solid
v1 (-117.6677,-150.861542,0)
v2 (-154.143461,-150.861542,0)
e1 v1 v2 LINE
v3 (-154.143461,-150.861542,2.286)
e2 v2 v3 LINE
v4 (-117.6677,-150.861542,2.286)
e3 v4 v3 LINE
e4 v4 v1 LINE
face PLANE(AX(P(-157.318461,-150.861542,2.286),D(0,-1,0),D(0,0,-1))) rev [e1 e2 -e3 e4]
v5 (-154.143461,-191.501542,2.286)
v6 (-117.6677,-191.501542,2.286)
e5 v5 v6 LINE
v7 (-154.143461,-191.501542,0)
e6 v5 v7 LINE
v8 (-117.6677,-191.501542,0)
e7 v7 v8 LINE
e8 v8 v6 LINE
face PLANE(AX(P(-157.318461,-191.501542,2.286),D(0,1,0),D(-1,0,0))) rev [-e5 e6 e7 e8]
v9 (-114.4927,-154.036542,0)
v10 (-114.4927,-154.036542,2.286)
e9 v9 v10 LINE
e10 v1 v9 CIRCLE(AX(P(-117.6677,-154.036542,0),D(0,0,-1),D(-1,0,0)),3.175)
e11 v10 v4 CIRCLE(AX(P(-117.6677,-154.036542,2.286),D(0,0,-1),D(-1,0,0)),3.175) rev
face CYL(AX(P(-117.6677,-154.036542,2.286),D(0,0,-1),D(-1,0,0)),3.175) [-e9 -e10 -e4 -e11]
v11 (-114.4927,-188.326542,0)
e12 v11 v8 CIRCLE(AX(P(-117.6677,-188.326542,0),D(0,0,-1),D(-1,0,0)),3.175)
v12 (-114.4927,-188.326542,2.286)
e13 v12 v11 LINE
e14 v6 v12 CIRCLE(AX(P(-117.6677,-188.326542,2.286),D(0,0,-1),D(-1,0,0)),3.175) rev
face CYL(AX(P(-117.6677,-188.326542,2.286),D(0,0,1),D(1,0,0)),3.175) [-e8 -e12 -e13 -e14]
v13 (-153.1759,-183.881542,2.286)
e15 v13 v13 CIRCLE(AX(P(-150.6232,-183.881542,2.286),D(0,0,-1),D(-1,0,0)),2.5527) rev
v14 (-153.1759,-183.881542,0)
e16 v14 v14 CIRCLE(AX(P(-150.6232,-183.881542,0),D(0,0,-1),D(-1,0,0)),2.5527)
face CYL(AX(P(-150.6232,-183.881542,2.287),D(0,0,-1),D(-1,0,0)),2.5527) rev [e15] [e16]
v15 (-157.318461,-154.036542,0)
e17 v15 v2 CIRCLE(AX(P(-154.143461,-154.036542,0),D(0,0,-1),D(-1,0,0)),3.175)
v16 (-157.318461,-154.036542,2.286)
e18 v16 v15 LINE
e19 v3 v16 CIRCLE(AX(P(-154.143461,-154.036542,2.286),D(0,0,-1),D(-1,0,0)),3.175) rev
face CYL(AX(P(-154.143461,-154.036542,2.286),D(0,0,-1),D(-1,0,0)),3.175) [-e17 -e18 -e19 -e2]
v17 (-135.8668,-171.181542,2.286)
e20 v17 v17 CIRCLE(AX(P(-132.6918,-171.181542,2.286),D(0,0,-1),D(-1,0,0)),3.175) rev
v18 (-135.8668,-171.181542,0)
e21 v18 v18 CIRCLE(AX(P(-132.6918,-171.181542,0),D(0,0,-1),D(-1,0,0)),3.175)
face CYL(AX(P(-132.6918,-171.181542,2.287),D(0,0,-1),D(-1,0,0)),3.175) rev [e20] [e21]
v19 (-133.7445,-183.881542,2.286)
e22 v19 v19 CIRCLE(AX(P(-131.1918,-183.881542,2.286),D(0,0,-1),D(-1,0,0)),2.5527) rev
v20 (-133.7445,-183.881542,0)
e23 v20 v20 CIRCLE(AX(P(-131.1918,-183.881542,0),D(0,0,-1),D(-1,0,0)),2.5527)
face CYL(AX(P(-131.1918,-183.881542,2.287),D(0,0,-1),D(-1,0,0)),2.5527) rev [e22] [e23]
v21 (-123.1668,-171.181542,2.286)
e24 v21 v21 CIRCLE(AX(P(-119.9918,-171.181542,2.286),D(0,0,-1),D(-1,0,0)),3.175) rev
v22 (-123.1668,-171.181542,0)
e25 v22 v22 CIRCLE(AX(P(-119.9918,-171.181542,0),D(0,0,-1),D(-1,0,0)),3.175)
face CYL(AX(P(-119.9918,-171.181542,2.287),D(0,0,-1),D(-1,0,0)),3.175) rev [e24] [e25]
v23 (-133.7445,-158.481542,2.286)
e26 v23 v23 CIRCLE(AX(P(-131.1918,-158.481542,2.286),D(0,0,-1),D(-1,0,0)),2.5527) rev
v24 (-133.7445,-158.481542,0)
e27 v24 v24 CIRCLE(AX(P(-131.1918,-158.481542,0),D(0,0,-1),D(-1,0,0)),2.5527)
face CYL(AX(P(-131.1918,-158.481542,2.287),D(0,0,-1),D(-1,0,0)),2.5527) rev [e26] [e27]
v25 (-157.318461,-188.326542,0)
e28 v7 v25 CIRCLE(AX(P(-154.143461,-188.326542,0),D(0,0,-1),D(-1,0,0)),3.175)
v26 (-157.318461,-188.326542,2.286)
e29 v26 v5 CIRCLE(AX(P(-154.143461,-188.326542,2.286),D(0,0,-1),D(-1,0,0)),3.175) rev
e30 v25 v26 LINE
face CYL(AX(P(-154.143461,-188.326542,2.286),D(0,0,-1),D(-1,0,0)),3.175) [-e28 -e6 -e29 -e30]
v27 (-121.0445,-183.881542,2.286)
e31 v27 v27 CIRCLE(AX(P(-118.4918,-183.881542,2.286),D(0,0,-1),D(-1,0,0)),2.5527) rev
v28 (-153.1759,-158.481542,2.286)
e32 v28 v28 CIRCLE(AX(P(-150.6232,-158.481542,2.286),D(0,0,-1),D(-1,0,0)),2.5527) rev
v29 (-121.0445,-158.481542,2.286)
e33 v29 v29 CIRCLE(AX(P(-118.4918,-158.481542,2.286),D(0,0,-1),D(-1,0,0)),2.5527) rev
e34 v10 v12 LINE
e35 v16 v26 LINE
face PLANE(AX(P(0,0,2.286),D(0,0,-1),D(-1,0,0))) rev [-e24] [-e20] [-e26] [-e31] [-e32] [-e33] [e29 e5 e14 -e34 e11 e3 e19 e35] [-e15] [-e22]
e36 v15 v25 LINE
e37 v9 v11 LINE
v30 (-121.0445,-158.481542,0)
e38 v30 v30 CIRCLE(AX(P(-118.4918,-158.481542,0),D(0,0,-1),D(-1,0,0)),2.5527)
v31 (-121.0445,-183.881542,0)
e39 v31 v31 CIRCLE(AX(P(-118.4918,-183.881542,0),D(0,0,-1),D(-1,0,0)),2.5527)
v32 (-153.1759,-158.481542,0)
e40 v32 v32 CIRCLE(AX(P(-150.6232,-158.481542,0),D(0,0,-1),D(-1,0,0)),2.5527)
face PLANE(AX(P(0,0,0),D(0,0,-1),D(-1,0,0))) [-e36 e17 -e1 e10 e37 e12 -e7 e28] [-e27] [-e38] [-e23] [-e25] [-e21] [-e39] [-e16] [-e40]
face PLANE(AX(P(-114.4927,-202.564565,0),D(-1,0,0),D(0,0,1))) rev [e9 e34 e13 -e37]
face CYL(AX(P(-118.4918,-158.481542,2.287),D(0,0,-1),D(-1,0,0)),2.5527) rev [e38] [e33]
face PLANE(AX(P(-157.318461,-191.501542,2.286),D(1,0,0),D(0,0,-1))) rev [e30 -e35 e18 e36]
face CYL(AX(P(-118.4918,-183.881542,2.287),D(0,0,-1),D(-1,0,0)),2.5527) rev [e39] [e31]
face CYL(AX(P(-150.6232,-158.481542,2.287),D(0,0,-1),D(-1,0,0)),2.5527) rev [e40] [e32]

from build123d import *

# Parameters (mm, degrees)
SKETCH1_W              = 76.2
SKETCH1_H              = 40.64
BASE_FLANGE1_DEPTH     = 2.286
CUT_EXTRUDE1_REACH     = 249.845
SKETCH6_R              = 2.5527
SKETCH6_R_2            = 3.175
FILLET1_R              = 3.175
SKETCH7_W              = 53.484881044
SKETCH7_H              = 41.537228889
REMOVE_3RD_STAGE_DEPTH = 2.54
FILLET2_R              = 3.175
SKETCH8_W              = 26.577580406
SKETCH8_H              = 64.780145769
REMOVE_2ND_STAGE_DEPTH = 248.845041068
FILLET3_R              = 3.175


# Sheet-metal steps are written as plain solids
with BuildPart() as part:
    # Sketch1 → Base-Flange1 (new body)
    with BuildSketch(Plane.XY):
        with Locations((-119.218460544, -171.181541922)):
            Rectangle(SKETCH1_W, SKETCH1_H)
    extrude(amount=BASE_FLANGE1_DEPTH)

    # Sketch6 → Cut-Extrude1 (cut, up to next)
    with BuildSketch(Plane(origin=(0, 0, 0), x_dir=(-1, 0, 0), z_dir=(0, 0, -1)), mode=Mode.PRIVATE) as cut_extrude1_sk1:
        with Locations((150.6232, -158.481541922)):
            Circle(SKETCH6_R)
    cut_extrude1_tool1 = extrude(cut_extrude1_sk1.sketch, amount=-CUT_EXTRUDE1_REACH, mode=Mode.PRIVATE) & part.part
    # Sketch6 → Cut-Extrude1 (cut, up to next)
    with BuildSketch(Plane(origin=(0, 0, 0), x_dir=(-1, 0, 0), z_dir=(0, 0, -1)), mode=Mode.PRIVATE) as cut_extrude1_sk2:
        with Locations((150.6232, -183.881541922)):
            Circle(SKETCH6_R)
    cut_extrude1_tool2 = extrude(cut_extrude1_sk2.sketch, amount=-CUT_EXTRUDE1_REACH, mode=Mode.PRIVATE) & part.part
    # Sketch6 → Cut-Extrude1 (cut, up to next)
    with BuildSketch(Plane(origin=(0, 0, 0), x_dir=(-1, 0, 0), z_dir=(0, 0, -1)), mode=Mode.PRIVATE) as cut_extrude1_sk3:
        with Locations((118.4918, -158.481541922)):
            Circle(SKETCH6_R)
    cut_extrude1_tool3 = extrude(cut_extrude1_sk3.sketch, amount=-CUT_EXTRUDE1_REACH, mode=Mode.PRIVATE) & part.part
    # Sketch6 → Cut-Extrude1 (cut, up to next)
    with BuildSketch(Plane(origin=(0, 0, 0), x_dir=(-1, 0, 0), z_dir=(0, 0, -1)), mode=Mode.PRIVATE) as cut_extrude1_sk4:
        with Locations((119.9918, -171.181541922)):
            Circle(SKETCH6_R_2)
    cut_extrude1_tool4 = extrude(cut_extrude1_sk4.sketch, amount=-CUT_EXTRUDE1_REACH, mode=Mode.PRIVATE) & part.part
    # Sketch6 → Cut-Extrude1 (cut, up to next)
    with BuildSketch(Plane(origin=(0, 0, 0), x_dir=(-1, 0, 0), z_dir=(0, 0, -1)), mode=Mode.PRIVATE) as cut_extrude1_sk5:
        with Locations((118.4918, -183.881541922)):
            Circle(SKETCH6_R)
    cut_extrude1_tool5 = extrude(cut_extrude1_sk5.sketch, amount=-CUT_EXTRUDE1_REACH, mode=Mode.PRIVATE) & part.part
    # Sketch6 → Cut-Extrude1 (cut, up to next)
    with BuildSketch(Plane(origin=(0, 0, 0), x_dir=(-1, 0, 0), z_dir=(0, 0, -1)), mode=Mode.PRIVATE) as cut_extrude1_sk6:
        with Locations((131.1918, -158.481541922)):
            Circle(SKETCH6_R)
    cut_extrude1_tool6 = extrude(cut_extrude1_sk6.sketch, amount=-CUT_EXTRUDE1_REACH, mode=Mode.PRIVATE) & part.part
    # Sketch6 → Cut-Extrude1 (cut, up to next)
    with BuildSketch(Plane(origin=(0, 0, 0), x_dir=(-1, 0, 0), z_dir=(0, 0, -1)), mode=Mode.PRIVATE) as cut_extrude1_sk7:
        with Locations((132.6918, -171.181541922)):
            Circle(SKETCH6_R_2)
    cut_extrude1_tool7 = extrude(cut_extrude1_sk7.sketch, amount=-CUT_EXTRUDE1_REACH, mode=Mode.PRIVATE) & part.part
    # Sketch6 → Cut-Extrude1 (cut, up to next)
    with BuildSketch(Plane(origin=(0, 0, 0), x_dir=(-1, 0, 0), z_dir=(0, 0, -1)), mode=Mode.PRIVATE) as cut_extrude1_sk8:
        with Locations((131.1918, -183.881541922)):
            Circle(SKETCH6_R)
    cut_extrude1_tool8 = extrude(cut_extrude1_sk8.sketch, amount=-CUT_EXTRUDE1_REACH, mode=Mode.PRIVATE) & part.part
    # Sketch6 → Cut-Extrude1 (cut, up to next)
    with BuildSketch(Plane(origin=(0, 0, 0), x_dir=(-1, 0, 0), z_dir=(0, 0, -1)), mode=Mode.PRIVATE) as cut_extrude1_sk9:
        with Locations((105.7918, -158.481541922)):
            Circle(SKETCH6_R)
    cut_extrude1_tool9 = extrude(cut_extrude1_sk9.sketch, amount=-CUT_EXTRUDE1_REACH, mode=Mode.PRIVATE) & part.part
    # Sketch6 → Cut-Extrude1 (cut, up to next)
    with BuildSketch(Plane(origin=(0, 0, 0), x_dir=(-1, 0, 0), z_dir=(0, 0, -1)), mode=Mode.PRIVATE) as cut_extrude1_sk10:
        with Locations((107.2918, -171.181541922)):
            Circle(SKETCH6_R_2)
    cut_extrude1_tool10 = extrude(cut_extrude1_sk10.sketch, amount=-CUT_EXTRUDE1_REACH, mode=Mode.PRIVATE) & part.part
    # Sketch6 → Cut-Extrude1 (cut, up to next)
    with BuildSketch(Plane(origin=(0, 0, 0), x_dir=(-1, 0, 0), z_dir=(0, 0, -1)), mode=Mode.PRIVATE) as cut_extrude1_sk11:
        with Locations((105.7918, -183.881541922)):
            Circle(SKETCH6_R)
    cut_extrude1_tool11 = extrude(cut_extrude1_sk11.sketch, amount=-CUT_EXTRUDE1_REACH, mode=Mode.PRIVATE) & part.part
    # Sketch6 → Cut-Extrude1 (cut, up to next)
    with BuildSketch(Plane(origin=(0, 0, 0), x_dir=(-1, 0, 0), z_dir=(0, 0, -1)), mode=Mode.PRIVATE) as cut_extrude1_sk12:
        with Locations((93.0918, -158.481541922)):
            Circle(SKETCH6_R)
    cut_extrude1_tool12 = extrude(cut_extrude1_sk12.sketch, amount=-CUT_EXTRUDE1_REACH, mode=Mode.PRIVATE) & part.part
    # Sketch6 → Cut-Extrude1 (cut, up to next)
    with BuildSketch(Plane(origin=(0, 0, 0), x_dir=(-1, 0, 0), z_dir=(0, 0, -1)), mode=Mode.PRIVATE) as cut_extrude1_sk13:
        with Locations((94.5918, -171.181541922)):
            Circle(SKETCH6_R_2)
    cut_extrude1_tool13 = extrude(cut_extrude1_sk13.sketch, amount=-CUT_EXTRUDE1_REACH, mode=Mode.PRIVATE) & part.part
    # Sketch6 → Cut-Extrude1 (cut, up to next)
    with BuildSketch(Plane(origin=(0, 0, 0), x_dir=(-1, 0, 0), z_dir=(0, 0, -1)), mode=Mode.PRIVATE) as cut_extrude1_sk14:
        with Locations((93.0918, -183.881541922)):
            Circle(SKETCH6_R)
    cut_extrude1_tool14 = extrude(cut_extrude1_sk14.sketch, amount=-CUT_EXTRUDE1_REACH, mode=Mode.PRIVATE) & part.part
    add(cut_extrude1_tool1.solids().sort_by_distance((-150.6232, -158.481542, 0))[0], mode=Mode.SUBTRACT)
    add(cut_extrude1_tool2.solids().sort_by_distance((-150.6232, -183.881542, 0))[0], mode=Mode.SUBTRACT)
    add(cut_extrude1_tool3.solids().sort_by_distance((-118.4918, -158.481542, 0))[0], mode=Mode.SUBTRACT)
    add(cut_extrude1_tool4.solids().sort_by_distance((-119.9918, -171.181542, 0))[0], mode=Mode.SUBTRACT)
    add(cut_extrude1_tool5.solids().sort_by_distance((-118.4918, -183.881542, 0))[0], mode=Mode.SUBTRACT)
    add(cut_extrude1_tool6.solids().sort_by_distance((-131.1918, -158.481542, 0))[0], mode=Mode.SUBTRACT)
    add(cut_extrude1_tool7.solids().sort_by_distance((-132.6918, -171.181542, 0))[0], mode=Mode.SUBTRACT)
    add(cut_extrude1_tool8.solids().sort_by_distance((-131.1918, -183.881542, 0))[0], mode=Mode.SUBTRACT)
    add(cut_extrude1_tool9.solids().sort_by_distance((-105.7918, -158.481542, 0))[0], mode=Mode.SUBTRACT)
    add(cut_extrude1_tool10.solids().sort_by_distance((-107.2918, -171.181542, 0))[0], mode=Mode.SUBTRACT)
    add(cut_extrude1_tool11.solids().sort_by_distance((-105.7918, -183.881542, 0))[0], mode=Mode.SUBTRACT)
    add(cut_extrude1_tool12.solids().sort_by_distance((-93.0918, -158.481542, 0))[0], mode=Mode.SUBTRACT)
    add(cut_extrude1_tool13.solids().sort_by_distance((-94.5918, -171.181542, 0))[0], mode=Mode.SUBTRACT)
    add(cut_extrude1_tool14.solids().sort_by_distance((-93.0918, -183.881542, 0))[0], mode=Mode.SUBTRACT)

    # Fillet1
    fillet1_edges = [part.edges().sort_by_distance(p)[0] for p in [
        (-157.318460544, -150.861541922, 1.143),
        (-81.118460544, -150.861541922, 1.143),
        (-81.118460544, -191.501541922, 1.143),
        (-157.318460544, -191.501541922, 1.143),
    ]]
    fillet(fillet1_edges, radius=FILLET1_R)

    # Sketch7 → Remove 3rd Stage (cut)
    with BuildSketch(Plane.XY.offset(2.286)):
        with Locations((-75.050259478, -170.732927477)):
            Rectangle(SKETCH7_W, SKETCH7_H)
    extrude(amount=-REMOVE_3RD_STAGE_DEPTH, mode=Mode.SUBTRACT)

    # Fillet2
    fillet2_edges = [part.edges().sort_by_distance(p)[0] for p in [
        (-101.7927, -150.861541922, 1.143),
        (-101.7927, -191.501541922, 1.143),
    ]]
    fillet(fillet2_edges, radius=FILLET2_R)

    # Sketch8 → Remove 2nd Stage (cut, through all)
    with BuildSketch(Plane.XY.offset(2.286)):
        with Locations((-101.203909797, -170.174492323)):
            Rectangle(SKETCH8_W, SKETCH8_H)
    extrude(amount=-REMOVE_2ND_STAGE_DEPTH, mode=Mode.SUBTRACT)

    # Fillet3
    fillet3_edges = [part.edges().sort_by_distance(p)[0] for p in [
        (-114.4927, -191.501541922, 1.143),
        (-114.4927, -150.861541922, 1.143),
    ]]
    fillet(fillet3_edges, radius=FILLET3_R)


solid = part.part
